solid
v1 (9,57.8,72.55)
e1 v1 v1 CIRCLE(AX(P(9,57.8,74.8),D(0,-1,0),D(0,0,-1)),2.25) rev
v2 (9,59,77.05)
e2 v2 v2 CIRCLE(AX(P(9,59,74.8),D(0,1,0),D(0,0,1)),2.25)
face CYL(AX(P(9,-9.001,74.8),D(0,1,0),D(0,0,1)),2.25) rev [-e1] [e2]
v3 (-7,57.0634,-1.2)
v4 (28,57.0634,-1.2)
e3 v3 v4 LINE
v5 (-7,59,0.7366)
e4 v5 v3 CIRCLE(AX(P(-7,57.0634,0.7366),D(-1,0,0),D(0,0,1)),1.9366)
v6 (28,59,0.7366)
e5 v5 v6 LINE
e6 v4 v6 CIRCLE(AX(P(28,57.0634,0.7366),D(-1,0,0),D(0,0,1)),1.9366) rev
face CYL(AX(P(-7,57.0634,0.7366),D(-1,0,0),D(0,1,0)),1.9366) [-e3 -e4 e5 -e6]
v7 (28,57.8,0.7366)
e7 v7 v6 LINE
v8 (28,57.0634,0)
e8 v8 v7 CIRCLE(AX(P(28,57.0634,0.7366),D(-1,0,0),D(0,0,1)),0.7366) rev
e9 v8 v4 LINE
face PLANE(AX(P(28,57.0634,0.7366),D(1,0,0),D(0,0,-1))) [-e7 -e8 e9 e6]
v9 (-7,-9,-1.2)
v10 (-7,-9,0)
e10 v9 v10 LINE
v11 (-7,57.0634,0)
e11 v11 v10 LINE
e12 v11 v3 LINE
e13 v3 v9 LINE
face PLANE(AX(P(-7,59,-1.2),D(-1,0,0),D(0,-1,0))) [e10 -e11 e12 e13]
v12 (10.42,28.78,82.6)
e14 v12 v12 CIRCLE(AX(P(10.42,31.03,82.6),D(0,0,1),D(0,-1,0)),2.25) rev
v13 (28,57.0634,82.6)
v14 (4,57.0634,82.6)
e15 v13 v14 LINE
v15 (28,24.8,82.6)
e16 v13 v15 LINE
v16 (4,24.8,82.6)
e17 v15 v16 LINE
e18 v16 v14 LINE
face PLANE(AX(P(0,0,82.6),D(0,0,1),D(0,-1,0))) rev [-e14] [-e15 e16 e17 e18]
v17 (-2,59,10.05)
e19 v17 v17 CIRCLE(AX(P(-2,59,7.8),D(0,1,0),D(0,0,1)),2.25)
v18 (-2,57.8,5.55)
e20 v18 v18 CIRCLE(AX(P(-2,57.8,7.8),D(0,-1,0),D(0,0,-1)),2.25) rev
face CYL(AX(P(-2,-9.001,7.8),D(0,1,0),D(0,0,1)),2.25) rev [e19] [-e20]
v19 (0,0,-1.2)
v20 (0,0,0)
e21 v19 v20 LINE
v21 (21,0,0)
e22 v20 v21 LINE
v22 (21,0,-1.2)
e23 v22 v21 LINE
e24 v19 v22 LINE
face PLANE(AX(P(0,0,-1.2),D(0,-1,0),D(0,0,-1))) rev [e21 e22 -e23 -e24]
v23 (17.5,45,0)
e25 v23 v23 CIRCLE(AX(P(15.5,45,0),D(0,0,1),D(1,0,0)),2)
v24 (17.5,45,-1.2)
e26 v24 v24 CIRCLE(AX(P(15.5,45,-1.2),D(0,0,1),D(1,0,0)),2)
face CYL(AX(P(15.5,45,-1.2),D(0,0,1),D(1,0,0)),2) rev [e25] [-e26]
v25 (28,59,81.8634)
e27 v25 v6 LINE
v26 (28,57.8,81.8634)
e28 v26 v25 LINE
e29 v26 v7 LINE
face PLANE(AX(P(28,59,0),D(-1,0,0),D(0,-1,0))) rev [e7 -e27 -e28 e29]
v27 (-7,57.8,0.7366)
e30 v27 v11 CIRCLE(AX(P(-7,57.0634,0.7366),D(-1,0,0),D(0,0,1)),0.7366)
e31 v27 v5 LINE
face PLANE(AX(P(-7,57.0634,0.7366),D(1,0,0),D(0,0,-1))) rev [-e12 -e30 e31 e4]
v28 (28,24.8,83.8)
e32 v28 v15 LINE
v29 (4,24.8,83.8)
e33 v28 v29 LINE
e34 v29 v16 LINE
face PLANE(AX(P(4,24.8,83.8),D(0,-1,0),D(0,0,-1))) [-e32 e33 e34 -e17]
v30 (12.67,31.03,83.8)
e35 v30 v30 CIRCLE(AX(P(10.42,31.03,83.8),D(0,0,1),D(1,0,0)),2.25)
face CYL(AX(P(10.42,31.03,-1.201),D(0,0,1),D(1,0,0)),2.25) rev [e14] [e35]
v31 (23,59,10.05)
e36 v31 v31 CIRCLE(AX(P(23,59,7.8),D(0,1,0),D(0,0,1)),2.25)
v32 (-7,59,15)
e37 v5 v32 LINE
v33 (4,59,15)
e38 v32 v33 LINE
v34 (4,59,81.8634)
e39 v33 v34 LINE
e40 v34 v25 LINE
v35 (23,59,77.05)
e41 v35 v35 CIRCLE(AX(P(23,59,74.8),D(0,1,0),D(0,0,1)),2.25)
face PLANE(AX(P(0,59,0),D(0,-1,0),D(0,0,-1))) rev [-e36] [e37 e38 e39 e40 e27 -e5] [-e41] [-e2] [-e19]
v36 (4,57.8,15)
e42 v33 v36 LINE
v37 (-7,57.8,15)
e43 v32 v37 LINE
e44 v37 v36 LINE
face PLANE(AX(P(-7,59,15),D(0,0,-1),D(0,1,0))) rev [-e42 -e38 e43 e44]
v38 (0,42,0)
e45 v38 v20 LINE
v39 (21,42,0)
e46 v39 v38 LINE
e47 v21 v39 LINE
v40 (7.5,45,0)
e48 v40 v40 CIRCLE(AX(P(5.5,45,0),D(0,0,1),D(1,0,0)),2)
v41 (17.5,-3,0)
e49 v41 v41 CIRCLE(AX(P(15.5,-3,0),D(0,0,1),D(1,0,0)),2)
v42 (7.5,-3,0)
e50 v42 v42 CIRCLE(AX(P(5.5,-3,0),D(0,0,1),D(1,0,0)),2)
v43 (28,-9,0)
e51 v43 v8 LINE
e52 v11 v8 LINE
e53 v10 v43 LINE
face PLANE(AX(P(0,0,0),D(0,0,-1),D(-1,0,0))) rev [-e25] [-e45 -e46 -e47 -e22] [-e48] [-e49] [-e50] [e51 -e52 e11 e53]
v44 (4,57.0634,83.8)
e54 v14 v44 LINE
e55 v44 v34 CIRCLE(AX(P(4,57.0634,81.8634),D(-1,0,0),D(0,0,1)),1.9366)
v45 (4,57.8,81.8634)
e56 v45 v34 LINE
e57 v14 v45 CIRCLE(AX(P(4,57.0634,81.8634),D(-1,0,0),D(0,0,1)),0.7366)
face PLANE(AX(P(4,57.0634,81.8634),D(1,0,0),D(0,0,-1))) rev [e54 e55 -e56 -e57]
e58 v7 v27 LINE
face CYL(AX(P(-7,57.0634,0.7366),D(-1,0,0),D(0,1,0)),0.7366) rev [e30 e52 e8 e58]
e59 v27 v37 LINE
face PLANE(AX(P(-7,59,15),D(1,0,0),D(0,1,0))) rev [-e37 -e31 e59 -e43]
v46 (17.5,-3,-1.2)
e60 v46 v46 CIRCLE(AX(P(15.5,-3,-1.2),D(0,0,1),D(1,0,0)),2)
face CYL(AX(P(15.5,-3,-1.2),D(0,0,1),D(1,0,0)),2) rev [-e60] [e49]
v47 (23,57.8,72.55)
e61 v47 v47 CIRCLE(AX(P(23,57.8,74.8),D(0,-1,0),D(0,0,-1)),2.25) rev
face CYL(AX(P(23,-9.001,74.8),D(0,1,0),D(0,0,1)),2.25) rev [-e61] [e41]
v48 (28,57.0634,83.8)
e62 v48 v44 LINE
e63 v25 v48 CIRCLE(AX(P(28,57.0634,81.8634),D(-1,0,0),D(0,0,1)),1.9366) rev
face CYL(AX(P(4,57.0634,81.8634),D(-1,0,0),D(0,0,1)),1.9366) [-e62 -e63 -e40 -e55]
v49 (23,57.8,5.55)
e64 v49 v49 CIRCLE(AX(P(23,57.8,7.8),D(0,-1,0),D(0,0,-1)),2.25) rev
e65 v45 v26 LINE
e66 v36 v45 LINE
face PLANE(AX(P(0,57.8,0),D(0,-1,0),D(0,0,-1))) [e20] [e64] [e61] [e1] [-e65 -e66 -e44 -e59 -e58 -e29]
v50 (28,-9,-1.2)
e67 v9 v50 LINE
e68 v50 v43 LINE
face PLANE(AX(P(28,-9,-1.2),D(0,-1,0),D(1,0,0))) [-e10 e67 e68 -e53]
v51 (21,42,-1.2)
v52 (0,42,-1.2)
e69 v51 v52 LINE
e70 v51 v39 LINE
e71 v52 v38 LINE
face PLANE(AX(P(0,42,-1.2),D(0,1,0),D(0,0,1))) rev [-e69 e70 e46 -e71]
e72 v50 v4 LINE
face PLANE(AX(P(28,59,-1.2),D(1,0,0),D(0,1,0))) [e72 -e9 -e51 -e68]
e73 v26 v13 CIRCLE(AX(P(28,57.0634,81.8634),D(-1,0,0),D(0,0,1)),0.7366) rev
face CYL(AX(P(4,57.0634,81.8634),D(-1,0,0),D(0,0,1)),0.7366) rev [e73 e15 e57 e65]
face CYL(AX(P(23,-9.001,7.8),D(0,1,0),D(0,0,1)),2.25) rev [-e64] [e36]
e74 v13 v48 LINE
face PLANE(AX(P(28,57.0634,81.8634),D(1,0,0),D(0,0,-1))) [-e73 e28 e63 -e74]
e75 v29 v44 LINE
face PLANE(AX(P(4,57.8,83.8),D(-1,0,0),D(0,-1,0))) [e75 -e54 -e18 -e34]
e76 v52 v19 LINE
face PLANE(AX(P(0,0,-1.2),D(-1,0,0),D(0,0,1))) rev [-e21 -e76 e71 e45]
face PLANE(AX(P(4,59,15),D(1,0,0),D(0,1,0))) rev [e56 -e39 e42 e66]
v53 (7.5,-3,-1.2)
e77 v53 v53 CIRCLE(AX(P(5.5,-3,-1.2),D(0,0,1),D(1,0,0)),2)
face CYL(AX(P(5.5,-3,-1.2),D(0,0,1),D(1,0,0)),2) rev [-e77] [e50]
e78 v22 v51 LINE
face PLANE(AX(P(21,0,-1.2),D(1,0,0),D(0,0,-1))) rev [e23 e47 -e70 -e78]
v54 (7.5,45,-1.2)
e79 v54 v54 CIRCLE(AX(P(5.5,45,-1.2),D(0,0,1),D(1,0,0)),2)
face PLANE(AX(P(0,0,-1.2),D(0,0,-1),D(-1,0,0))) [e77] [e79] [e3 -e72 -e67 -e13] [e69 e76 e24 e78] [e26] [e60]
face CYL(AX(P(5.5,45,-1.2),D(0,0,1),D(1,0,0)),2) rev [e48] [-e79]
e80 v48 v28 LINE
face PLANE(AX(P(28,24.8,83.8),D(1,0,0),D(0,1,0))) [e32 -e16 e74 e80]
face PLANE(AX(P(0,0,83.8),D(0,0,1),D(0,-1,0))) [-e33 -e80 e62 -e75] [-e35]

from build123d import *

# Parameters (mm, degrees)
SKETCH_1_W                       = 35
SKETCH_1_H                       = 68
SKETCH_1_R                       = 2
SKETCH_1_W_2                     = 21
SKETCH_1_H_2                     = 42
SM_BASE_FLANGE_1_DEPTH           = 1.2
SM_EDGE_FLANGE_1_STRIP_W         = 6.2732
SM_EDGE_FLANGE_1_STRIP_H         = 1.2
SM_EDGE_FLANGE_1_STRIP_CUT_DEPTH = 35
SM_EDGE_FLANGE_1_DEPTH           = 35
SM_EDGE_FLANGE_1_FLAT_DEPTH      = 1.2
SM_EDGE_FLANGE_2_STRIP_W         = 6.2732
SM_EDGE_FLANGE_2_STRIP_H         = 1.2
SM_EDGE_FLANGE_2_STRIP_CUT_DEPTH = 24
SM_EDGE_FLANGE_2_DEPTH           = 24
CUT_EXTRUDE_1_REACH              = 109.191
SKETCH_12_R                      = 2.25
CUT_EXTRUDE_2_REACH              = 113.492
SKETCH_13_R                      = 2.25


# Sheet-metal steps are written as plain solids
with BuildPart() as part:
    # Sketch 1 → Базовая кромка1 (new body)
    with BuildSketch(Plane.XY):
        with Locations((10.5, 25)):
            Rectangle(SKETCH_1_W, SKETCH_1_H)
        with Locations((5.5, 45)):
            Circle(SKETCH_1_R, mode=Mode.SUBTRACT)
        with Locations((15.5, 45)):
            Circle(SKETCH_1_R, mode=Mode.SUBTRACT)
        with Locations((5.5, -3)):
            Circle(SKETCH_1_R, mode=Mode.SUBTRACT)
        with Locations((15.5, -3)):
            Circle(SKETCH_1_R, mode=Mode.SUBTRACT)
        with Locations((10.5, 21)):
            Rectangle(SKETCH_1_W_2, SKETCH_1_H_2, mode=Mode.SUBTRACT)
    extrude(amount=-SM_BASE_FLANGE_1_DEPTH)

    # Ребро-кромка1 strip (across the edge) → Ребро-кромка1 strip cut (cut)
    with BuildSketch(Plane(origin=(28, 59, 0), x_dir=(0, -1, 0), z_dir=(-1, 0, 0))):
        with Locations((-1.2, -0.6)):
            Rectangle(SM_EDGE_FLANGE_1_STRIP_W, SM_EDGE_FLANGE_1_STRIP_H)
    extrude(amount=SM_EDGE_FLANGE_1_STRIP_CUT_DEPTH, mode=Mode.SUBTRACT)

    # Ребро-кромка1 bend section (across the edge) → Ребро-кромка1 (add)
    with BuildSketch(Plane(origin=(28, 59, 0), x_dir=(0, -1, 0), z_dir=(-1, 0, 0))):
        with BuildLine():
            Line((0, 0.7366), (1.2, 0.7366))
            ThreePointArc((1.2, 0.7366), (1.415745145, 0.215745145), (1.9366, 0))
            Line((1.9366, 0), (1.9366, -1.2))
            ThreePointArc((1.9366, -1.2), (0.567217008, -0.632782992), (0, 0.7366))
        make_face()
    extrude(amount=SM_EDGE_FLANGE_1_DEPTH)

    # Ребро-кромка1 profile (on flange) → Ребро-кромка1 flat (add)
    with BuildSketch(Plane(origin=(0, 59, 0), x_dir=(-1, 0, 0), z_dir=(0, 1, 0))):
        Polygon((-28, 83.8), (-28, 0.7366), (7, 0.7366), (7, 15), (-4, 15), (-4, 83.8), align=None)
    extrude(amount=-SM_EDGE_FLANGE_1_FLAT_DEPTH)

    # Ребро-кромка2 strip (across the edge) → Ребро-кромка2 strip cut (cut)
    with BuildSketch(Plane(origin=(28, 57.8, 83.8), x_dir=(0, 0, -1), z_dir=(-1, 0, 0))):
        with Locations((-1.2, -0.6)):
            Rectangle(SM_EDGE_FLANGE_2_STRIP_W, SM_EDGE_FLANGE_2_STRIP_H)
    extrude(amount=SM_EDGE_FLANGE_2_STRIP_CUT_DEPTH, mode=Mode.SUBTRACT)

    # Ребро-кромка2 section (across the edge) → Ребро-кромка2 (add)
    with BuildSketch(Plane(origin=(28, 57.8, 83.8), x_dir=(0, 0, -1), z_dir=(-1, 0, 0))):
        with BuildLine():
            Line((0, 0.7366), (0, 33))
            Line((0, 33), (1.2, 33))
            Line((1.2, 33), (1.2, 0.7366))
            ThreePointArc((1.2, 0.7366), (1.415745145, 0.215745145), (1.9366, 0))
            Line((1.9366, 0), (1.9366, -1.2))
            ThreePointArc((1.9366, -1.2), (0.567217008, -0.632782992), (0, 0.7366))
        make_face()
    extrude(amount=SM_EDGE_FLANGE_2_DEPTH)

    # Эскиз12 → Вырез-Вытянуть1 (cut, up to next)
    with BuildSketch(Plane.XY.offset(83.8), mode=Mode.PRIVATE) as cut_extrude_1_sk1:
        with Locations((10.419999997, 31.03)):
            Circle(SKETCH_12_R)
    cut_extrude_1_tool1 = extrude(cut_extrude_1_sk1.sketch, amount=-CUT_EXTRUDE_1_REACH, mode=Mode.PRIVATE) & part.part
    add(cut_extrude_1_tool1.solids().sort_by_distance((10.42, 31.03, 83.8))[0], mode=Mode.SUBTRACT)

    # Эскиз13 → Вырез-Вытянуть2 (cut, up to next)
    with BuildSketch(Plane(origin=(0, 59, 0), x_dir=(1, 0, 0), z_dir=(0, 1, 0)), mode=Mode.PRIVATE) as cut_extrude_2_sk1:
        with Locations(Location((23, -7.8, 0), (0, 0, 270))):
            Circle(SKETCH_13_R)
    cut_extrude_2_tool1 = extrude(cut_extrude_2_sk1.sketch, amount=-CUT_EXTRUDE_2_REACH, mode=Mode.PRIVATE) & part.part
    # Эскиз13 → Вырез-Вытянуть2 (cut, up to next)
    with BuildSketch(Plane(origin=(0, 59, 0), x_dir=(1, 0, 0), z_dir=(0, 1, 0)), mode=Mode.PRIVATE) as cut_extrude_2_sk2:
        with Locations(Location((-2, -7.8, 0), (0, 0, 270))):
            Circle(SKETCH_13_R)
    cut_extrude_2_tool2 = extrude(cut_extrude_2_sk2.sketch, amount=-CUT_EXTRUDE_2_REACH, mode=Mode.PRIVATE) & part.part
    # Эскиз13 → Вырез-Вытянуть2 (cut, up to next)
    with BuildSketch(Plane(origin=(0, 59, 0), x_dir=(1, 0, 0), z_dir=(0, 1, 0)), mode=Mode.PRIVATE) as cut_extrude_2_sk3:
        with Locations(Location((9, -74.8, 0), (0, 0, 270))):
            Circle(SKETCH_13_R)
    cut_extrude_2_tool3 = extrude(cut_extrude_2_sk3.sketch, amount=-CUT_EXTRUDE_2_REACH, mode=Mode.PRIVATE) & part.part
    # Эскиз13 → Вырез-Вытянуть2 (cut, up to next)
    with BuildSketch(Plane(origin=(0, 59, 0), x_dir=(1, 0, 0), z_dir=(0, 1, 0)), mode=Mode.PRIVATE) as cut_extrude_2_sk4:
        with Locations(Location((23, -74.8, 0), (0, 0, 270))):
            Circle(SKETCH_13_R)
    cut_extrude_2_tool4 = extrude(cut_extrude_2_sk4.sketch, amount=-CUT_EXTRUDE_2_REACH, mode=Mode.PRIVATE) & part.part
    add(cut_extrude_2_tool1.solids().sort_by_distance((23, 59, 7.8))[0], mode=Mode.SUBTRACT)
    add(cut_extrude_2_tool2.solids().sort_by_distance((-2, 59, 7.8))[0], mode=Mode.SUBTRACT)
    add(cut_extrude_2_tool3.solids().sort_by_distance((9, 59, 74.8))[0], mode=Mode.SUBTRACT)
    add(cut_extrude_2_tool4.solids().sort_by_distance((23, 59, 74.8))[0], mode=Mode.SUBTRACT)


solid = part.part
